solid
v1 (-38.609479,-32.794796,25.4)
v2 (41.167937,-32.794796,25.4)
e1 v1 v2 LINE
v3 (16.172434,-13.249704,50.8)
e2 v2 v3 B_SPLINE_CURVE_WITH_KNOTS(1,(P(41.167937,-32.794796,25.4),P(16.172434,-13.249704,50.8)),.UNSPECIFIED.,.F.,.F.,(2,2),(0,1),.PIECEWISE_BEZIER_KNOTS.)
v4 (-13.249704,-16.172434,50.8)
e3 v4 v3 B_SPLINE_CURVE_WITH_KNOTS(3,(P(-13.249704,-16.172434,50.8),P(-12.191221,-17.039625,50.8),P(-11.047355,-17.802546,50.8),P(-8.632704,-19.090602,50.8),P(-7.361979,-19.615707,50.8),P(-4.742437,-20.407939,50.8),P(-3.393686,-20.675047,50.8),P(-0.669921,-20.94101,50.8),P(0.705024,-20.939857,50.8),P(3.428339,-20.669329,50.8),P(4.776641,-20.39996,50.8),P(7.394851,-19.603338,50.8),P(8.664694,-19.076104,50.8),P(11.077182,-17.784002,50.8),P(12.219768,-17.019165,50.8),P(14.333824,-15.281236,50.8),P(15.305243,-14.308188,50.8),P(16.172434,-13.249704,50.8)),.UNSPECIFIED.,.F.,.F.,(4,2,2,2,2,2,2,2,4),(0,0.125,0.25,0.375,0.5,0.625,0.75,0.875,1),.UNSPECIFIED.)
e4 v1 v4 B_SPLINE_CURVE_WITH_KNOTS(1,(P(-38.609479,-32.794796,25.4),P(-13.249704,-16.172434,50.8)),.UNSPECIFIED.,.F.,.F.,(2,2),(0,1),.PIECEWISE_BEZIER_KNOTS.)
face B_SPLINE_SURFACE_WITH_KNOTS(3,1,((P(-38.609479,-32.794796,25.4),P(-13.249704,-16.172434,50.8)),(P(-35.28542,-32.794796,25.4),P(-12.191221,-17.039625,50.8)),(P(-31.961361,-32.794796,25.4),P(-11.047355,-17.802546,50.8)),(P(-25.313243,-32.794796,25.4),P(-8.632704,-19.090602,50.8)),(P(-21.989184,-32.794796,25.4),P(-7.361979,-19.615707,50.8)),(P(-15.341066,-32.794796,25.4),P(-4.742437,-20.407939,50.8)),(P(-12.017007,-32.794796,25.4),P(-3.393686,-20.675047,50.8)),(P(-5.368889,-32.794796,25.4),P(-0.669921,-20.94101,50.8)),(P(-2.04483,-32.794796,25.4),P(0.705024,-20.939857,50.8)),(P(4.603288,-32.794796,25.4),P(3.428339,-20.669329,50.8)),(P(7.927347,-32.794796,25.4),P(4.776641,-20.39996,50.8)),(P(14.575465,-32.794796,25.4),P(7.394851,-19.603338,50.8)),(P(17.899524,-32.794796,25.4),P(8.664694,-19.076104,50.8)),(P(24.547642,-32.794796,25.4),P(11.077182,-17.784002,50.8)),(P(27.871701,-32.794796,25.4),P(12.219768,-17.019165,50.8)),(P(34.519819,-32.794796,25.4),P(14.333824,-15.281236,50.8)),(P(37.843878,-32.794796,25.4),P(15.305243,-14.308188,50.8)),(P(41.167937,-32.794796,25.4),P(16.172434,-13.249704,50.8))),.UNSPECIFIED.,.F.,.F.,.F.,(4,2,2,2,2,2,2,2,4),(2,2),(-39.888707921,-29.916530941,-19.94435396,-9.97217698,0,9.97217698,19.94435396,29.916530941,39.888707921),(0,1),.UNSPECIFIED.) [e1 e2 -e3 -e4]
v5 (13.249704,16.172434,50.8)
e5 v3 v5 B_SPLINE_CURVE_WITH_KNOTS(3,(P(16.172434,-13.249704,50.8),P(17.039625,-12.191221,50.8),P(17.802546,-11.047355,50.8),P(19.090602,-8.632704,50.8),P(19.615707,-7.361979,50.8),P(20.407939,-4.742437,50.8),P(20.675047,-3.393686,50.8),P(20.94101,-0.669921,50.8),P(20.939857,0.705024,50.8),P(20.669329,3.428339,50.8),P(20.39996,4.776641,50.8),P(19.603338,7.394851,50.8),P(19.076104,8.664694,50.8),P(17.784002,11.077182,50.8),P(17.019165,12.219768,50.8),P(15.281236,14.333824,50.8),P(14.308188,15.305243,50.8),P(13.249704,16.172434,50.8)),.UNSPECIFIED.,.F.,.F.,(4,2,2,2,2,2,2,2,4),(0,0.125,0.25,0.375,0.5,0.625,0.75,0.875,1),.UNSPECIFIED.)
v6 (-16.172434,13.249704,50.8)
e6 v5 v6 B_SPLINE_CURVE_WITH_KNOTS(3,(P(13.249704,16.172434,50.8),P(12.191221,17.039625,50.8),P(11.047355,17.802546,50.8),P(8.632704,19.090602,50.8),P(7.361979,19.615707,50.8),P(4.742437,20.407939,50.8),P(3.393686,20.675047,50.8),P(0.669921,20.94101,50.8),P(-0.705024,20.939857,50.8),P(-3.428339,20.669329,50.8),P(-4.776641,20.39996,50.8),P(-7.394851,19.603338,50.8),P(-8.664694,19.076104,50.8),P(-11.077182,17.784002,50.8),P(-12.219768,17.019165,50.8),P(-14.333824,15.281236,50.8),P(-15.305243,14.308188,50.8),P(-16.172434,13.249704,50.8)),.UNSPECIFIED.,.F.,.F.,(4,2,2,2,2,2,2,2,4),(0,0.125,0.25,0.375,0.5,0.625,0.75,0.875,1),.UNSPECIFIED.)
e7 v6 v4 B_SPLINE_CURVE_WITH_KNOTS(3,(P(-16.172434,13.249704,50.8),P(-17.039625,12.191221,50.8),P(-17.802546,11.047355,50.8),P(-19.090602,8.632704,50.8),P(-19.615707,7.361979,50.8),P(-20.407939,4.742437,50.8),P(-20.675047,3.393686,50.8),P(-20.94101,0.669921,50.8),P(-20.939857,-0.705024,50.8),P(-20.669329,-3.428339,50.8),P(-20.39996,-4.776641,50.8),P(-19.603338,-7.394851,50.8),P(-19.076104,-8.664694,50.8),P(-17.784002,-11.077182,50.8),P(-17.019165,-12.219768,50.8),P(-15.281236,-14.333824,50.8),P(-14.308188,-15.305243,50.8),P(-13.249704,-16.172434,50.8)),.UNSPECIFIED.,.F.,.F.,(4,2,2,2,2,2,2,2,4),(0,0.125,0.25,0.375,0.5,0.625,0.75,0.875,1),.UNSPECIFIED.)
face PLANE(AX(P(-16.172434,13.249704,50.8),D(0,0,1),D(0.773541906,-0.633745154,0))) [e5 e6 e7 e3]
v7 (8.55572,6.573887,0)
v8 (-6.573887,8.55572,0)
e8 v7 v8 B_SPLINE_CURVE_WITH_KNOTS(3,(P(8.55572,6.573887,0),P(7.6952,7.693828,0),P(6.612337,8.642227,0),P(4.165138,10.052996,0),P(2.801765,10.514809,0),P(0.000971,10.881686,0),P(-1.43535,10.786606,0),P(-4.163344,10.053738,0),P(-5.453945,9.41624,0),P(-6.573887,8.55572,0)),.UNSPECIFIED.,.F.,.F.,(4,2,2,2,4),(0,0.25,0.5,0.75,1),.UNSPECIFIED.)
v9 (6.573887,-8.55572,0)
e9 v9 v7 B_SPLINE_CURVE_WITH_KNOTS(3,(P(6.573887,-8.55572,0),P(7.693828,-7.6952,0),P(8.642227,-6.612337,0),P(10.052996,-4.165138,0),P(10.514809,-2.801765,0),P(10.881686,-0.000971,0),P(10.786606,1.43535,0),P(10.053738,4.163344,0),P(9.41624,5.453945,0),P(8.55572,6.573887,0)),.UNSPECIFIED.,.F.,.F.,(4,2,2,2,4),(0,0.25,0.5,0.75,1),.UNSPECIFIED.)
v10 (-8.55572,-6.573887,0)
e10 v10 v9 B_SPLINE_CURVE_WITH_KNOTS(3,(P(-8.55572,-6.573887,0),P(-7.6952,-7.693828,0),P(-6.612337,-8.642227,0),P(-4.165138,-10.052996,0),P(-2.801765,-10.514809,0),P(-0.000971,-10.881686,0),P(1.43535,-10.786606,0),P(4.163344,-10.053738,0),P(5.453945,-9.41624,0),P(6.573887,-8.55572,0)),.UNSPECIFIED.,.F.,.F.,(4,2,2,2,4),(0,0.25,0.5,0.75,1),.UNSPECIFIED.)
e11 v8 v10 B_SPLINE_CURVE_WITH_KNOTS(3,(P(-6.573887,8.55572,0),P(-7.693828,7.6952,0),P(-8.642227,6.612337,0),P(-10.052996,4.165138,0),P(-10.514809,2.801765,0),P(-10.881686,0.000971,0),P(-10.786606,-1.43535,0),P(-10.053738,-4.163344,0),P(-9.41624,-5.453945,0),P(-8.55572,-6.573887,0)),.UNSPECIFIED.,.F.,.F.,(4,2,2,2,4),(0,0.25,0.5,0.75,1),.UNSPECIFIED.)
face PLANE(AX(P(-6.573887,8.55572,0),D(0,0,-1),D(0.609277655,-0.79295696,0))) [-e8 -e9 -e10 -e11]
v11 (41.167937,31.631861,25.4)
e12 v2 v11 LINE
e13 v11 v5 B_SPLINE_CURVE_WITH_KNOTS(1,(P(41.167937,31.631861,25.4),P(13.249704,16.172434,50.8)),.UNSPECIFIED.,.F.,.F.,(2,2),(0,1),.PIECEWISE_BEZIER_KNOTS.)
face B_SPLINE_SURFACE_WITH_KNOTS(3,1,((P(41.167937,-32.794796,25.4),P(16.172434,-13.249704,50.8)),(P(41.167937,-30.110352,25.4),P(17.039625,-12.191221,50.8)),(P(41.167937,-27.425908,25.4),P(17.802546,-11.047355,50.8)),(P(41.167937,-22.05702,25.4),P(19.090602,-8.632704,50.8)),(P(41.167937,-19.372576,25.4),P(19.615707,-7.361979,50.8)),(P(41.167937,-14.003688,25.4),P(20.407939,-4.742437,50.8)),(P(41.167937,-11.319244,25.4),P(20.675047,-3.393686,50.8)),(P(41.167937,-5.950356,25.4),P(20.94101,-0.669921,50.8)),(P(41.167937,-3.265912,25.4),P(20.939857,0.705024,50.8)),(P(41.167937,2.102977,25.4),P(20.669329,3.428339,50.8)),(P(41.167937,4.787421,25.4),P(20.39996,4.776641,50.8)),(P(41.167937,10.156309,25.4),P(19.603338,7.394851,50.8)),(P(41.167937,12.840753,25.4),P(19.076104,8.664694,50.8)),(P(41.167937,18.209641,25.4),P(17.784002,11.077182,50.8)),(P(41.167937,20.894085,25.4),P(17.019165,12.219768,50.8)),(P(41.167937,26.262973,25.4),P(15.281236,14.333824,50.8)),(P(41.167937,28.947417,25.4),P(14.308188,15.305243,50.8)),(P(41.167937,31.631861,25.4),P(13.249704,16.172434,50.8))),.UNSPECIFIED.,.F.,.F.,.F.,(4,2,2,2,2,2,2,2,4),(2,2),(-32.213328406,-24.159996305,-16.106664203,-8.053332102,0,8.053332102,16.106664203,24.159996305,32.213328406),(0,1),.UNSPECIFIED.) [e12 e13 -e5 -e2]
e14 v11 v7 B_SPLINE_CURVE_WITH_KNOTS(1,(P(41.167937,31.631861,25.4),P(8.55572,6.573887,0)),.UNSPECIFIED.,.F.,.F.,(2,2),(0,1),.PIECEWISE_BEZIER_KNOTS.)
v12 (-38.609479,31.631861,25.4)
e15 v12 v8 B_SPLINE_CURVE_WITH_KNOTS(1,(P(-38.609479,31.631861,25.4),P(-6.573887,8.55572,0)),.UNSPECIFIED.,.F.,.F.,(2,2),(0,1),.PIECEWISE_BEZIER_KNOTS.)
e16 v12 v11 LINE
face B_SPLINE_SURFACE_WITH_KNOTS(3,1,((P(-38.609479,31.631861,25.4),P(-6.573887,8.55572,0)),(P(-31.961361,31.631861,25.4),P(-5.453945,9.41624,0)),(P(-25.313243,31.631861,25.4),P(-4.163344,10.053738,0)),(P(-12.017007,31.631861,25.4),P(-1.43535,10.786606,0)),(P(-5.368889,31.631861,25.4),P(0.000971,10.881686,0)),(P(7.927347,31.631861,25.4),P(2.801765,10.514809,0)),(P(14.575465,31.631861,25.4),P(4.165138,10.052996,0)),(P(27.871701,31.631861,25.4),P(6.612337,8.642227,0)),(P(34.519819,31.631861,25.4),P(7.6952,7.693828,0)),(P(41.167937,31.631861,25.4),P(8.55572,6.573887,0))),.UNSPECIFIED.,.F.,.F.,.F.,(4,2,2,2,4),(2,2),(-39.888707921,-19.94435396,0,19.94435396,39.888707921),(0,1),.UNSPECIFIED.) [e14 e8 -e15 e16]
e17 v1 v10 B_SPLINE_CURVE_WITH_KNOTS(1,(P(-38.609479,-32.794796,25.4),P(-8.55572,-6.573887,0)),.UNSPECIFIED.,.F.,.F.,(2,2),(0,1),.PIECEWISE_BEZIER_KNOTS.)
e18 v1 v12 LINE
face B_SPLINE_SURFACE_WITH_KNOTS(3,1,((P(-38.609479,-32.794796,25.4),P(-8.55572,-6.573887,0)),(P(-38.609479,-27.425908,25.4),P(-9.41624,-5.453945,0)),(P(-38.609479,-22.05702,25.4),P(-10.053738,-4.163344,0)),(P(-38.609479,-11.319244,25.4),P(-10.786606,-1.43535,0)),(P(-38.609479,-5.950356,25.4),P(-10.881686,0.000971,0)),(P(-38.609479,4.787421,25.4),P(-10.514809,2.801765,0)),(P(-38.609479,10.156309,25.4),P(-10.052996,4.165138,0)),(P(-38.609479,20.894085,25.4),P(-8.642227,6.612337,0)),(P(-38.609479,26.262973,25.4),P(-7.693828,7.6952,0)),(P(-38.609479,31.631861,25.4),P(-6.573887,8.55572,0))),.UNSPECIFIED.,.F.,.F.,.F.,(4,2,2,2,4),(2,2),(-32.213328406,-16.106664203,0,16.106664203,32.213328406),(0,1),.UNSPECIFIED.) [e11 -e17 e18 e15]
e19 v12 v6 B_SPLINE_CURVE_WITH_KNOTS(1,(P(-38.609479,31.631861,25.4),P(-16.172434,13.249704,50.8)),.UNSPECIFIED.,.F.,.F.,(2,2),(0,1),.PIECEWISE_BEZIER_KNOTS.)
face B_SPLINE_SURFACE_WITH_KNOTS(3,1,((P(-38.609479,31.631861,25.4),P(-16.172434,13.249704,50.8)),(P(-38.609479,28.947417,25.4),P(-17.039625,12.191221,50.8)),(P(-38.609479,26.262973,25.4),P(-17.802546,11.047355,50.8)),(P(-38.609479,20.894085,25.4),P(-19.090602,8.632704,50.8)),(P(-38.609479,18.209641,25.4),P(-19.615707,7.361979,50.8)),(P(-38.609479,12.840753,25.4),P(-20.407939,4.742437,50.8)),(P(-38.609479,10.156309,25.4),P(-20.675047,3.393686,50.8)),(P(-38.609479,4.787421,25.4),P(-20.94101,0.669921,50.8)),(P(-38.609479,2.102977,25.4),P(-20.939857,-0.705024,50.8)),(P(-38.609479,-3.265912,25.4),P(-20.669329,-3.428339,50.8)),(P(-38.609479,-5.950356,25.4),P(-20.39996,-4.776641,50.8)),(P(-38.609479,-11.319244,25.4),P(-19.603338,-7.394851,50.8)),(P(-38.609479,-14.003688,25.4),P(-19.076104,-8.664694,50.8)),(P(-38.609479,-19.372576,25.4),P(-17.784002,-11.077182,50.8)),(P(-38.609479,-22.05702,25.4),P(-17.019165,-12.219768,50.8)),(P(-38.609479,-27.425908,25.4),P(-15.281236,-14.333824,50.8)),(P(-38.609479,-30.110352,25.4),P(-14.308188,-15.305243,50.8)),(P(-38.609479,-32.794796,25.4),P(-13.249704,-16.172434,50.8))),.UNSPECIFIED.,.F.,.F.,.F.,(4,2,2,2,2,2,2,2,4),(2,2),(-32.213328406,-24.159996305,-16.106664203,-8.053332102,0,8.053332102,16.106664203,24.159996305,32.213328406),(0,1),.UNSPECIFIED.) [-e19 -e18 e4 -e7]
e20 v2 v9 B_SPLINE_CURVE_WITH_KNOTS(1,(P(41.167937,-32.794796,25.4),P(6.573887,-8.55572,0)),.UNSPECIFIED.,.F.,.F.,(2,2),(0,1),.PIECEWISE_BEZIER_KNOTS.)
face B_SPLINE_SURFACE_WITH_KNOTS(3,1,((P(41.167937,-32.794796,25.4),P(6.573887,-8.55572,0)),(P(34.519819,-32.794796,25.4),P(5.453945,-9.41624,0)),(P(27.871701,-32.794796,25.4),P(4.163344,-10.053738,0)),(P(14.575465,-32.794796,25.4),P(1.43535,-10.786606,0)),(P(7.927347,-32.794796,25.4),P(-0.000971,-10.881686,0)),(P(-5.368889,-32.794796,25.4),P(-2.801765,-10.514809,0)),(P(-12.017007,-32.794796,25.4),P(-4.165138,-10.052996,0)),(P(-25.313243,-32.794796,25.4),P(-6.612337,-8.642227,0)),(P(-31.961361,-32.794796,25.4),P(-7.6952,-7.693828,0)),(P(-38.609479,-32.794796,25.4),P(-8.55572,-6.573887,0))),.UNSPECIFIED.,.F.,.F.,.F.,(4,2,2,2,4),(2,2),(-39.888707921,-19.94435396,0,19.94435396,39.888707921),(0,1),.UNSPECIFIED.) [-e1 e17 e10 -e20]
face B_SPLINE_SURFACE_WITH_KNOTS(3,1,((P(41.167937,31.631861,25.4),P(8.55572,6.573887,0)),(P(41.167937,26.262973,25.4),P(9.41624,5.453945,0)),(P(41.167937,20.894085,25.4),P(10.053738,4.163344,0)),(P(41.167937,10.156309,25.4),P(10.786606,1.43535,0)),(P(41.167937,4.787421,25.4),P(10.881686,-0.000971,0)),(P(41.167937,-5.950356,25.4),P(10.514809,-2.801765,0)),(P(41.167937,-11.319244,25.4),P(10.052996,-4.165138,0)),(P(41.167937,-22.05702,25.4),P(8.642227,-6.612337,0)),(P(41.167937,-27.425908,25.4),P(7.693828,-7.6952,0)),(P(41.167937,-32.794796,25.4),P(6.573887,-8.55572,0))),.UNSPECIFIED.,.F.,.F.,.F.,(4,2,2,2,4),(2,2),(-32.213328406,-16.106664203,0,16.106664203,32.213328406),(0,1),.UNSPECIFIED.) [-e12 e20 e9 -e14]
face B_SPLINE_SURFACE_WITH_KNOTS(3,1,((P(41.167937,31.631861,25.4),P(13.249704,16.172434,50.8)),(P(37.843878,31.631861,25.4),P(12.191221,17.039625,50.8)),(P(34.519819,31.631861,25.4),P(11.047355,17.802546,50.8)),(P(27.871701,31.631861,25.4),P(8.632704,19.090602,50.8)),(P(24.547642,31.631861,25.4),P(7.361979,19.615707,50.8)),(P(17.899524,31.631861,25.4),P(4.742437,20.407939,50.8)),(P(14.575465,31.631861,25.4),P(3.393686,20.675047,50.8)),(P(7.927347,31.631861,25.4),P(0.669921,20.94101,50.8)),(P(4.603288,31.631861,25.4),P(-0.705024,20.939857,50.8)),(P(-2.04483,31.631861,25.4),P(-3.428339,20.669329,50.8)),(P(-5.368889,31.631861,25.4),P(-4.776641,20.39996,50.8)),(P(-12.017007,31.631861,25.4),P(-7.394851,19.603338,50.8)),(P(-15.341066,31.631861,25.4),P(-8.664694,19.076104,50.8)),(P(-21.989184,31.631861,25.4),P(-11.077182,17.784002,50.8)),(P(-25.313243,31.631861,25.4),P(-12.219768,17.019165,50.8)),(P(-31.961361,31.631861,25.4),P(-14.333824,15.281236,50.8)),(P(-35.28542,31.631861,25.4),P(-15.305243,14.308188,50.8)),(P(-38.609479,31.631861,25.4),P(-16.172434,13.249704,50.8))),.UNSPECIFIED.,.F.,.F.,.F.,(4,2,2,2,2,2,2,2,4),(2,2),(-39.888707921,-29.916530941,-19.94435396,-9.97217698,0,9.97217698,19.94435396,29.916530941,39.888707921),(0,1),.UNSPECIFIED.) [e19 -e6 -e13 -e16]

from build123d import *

# Parameters (mm, degrees)
F3_W      = 79.7774158418
F3_H      = 64.4266568124
F5_FACE_W = 79.7774158418
F5_FACE_H = 64.4266568124


# Not quite as in the source:
# - the arcs of a loft's sections are written as splines that run evenly, so that the points pair up as in the source's solid


with BuildPart() as f5:
    # F3 (on offset) → F5 section 0
    with BuildSketch(Plane.XY.offset(25.4)):
        with Locations((1.2792292982, -0.5814675242)):
            Rectangle(F3_W, F3_H)
    # F2 (on offset) → F5 section 1
    with BuildSketch(Plane.XY.offset(50.8)):
        with BuildLine():
            add(Edge.make_bspline(
                [(-16.1724337652, 13.2497043015), (-17.0396248839, 12.1912209867), (-17.8025456302, 11.0473550868), (-19.0906024978, 8.6327041883), (-19.6157067692, 7.3619788968), (-20.4079389638, 4.7424374092), (-20.6750472976, 3.3936859865), (-20.9410097804, 0.6699214201), (-20.939857353, -0.7050243732), (-20.6693293349, -3.4283392736), (-20.3999604336, -4.7766410415), (-19.6033381546, -7.3948508116), (-19.0761044751, -8.6646940734), (-17.7840016828, -11.0771823799), (-17.0191645197, -12.2197677712), (-15.2812359996, -14.3338240416), (-14.3081876162, -15.3052426465), (-13.2497043015, -16.1724337652)],
                knots=[0, 0, 0, 0, 0.125, 0.125, 0.25, 0.25, 0.375, 0.375, 0.5, 0.5, 0.625, 0.625, 0.75, 0.75, 0.875, 0.875, 1, 1, 1, 1], degree=3))
            add(Edge.make_bspline(
                [(-13.2497043015, -16.1724337652), (-12.1912209867, -17.0396248839), (-11.0473550868, -17.8025456302), (-8.6327041883, -19.0906024978), (-7.3619788968, -19.6157067692), (-4.7424374092, -20.4079389638), (-3.3936859865, -20.6750472976), (-0.6699214201, -20.9410097804), (0.7050243732, -20.939857353), (3.4283392736, -20.6693293349), (4.7766410415, -20.3999604336), (7.3948508116, -19.6033381546), (8.6646940734, -19.0761044751), (11.0771823799, -17.7840016828), (12.2197677712, -17.0191645197), (14.3338240416, -15.2812359996), (15.3052426465, -14.3081876162), (16.1724337652, -13.2497043015)],
                knots=[0, 0, 0, 0, 0.125, 0.125, 0.25, 0.25, 0.375, 0.375, 0.5, 0.5, 0.625, 0.625, 0.75, 0.75, 0.875, 0.875, 1, 1, 1, 1], degree=3))
            add(Edge.make_bspline(
                [(16.1724337652, -13.2497043015), (17.0396248839, -12.1912209867), (17.8025456302, -11.0473550868), (19.0906024978, -8.6327041883), (19.6157067692, -7.3619788968), (20.4079389638, -4.7424374092), (20.6750472976, -3.3936859865), (20.9410097804, -0.6699214201), (20.939857353, 0.7050243732), (20.6693293349, 3.4283392736), (20.3999604336, 4.7766410415), (19.6033381546, 7.3948508116), (19.0761044751, 8.6646940734), (17.7840016828, 11.0771823799), (17.0191645197, 12.2197677712), (15.2812359996, 14.3338240416), (14.3081876162, 15.3052426465), (13.2497043015, 16.1724337652)],
                knots=[0, 0, 0, 0, 0.125, 0.125, 0.25, 0.25, 0.375, 0.375, 0.5, 0.5, 0.625, 0.625, 0.75, 0.75, 0.875, 0.875, 1, 1, 1, 1], degree=3))
            add(Edge.make_bspline(
                [(13.2497043015, 16.1724337652), (12.1912209867, 17.0396248839), (11.0473550868, 17.8025456302), (8.6327041883, 19.0906024978), (7.3619788968, 19.6157067692), (4.7424374092, 20.4079389638), (3.3936859865, 20.6750472976), (0.6699214201, 20.9410097804), (-0.7050243732, 20.939857353), (-3.4283392736, 20.6693293349), (-4.7766410415, 20.3999604336), (-7.3948508116, 19.6033381546), (-8.6646940734, 19.0761044751), (-11.0771823799, 17.7840016828), (-12.2197677712, 17.0191645197), (-14.3338240416, 15.2812359996), (-15.3052426465, 14.3081876162), (-16.1724337652, 13.2497043015)],
                knots=[0, 0, 0, 0, 0.125, 0.125, 0.25, 0.25, 0.375, 0.375, 0.5, 0.5, 0.625, 0.625, 0.75, 0.75, 0.875, 0.875, 1, 1, 1, 1], degree=3))
        make_face()
    loft(ruled=True)

    # F5_face (on face) → F6 section 0
    with BuildSketch(Plane(origin=(1.2792292982, -0.5814675242, 25.4), x_dir=(1, 0, 0), z_dir=(0, 0, -1))):
        Rectangle(F5_FACE_W, F5_FACE_H)
    # F4 (on Top) → F6 section 1
    with BuildSketch(Plane.XY):
        with BuildLine():
            add(Edge.make_bspline(
                [(8.5557200784, 6.5738865133), (7.6952003461, 7.6938276526), (6.6123366987, 8.6422274732), (4.1651377242, 10.0529955761), (2.8017652653, 10.5148087816), (0.0009706408, 10.8816860538), (-1.4353495317, 10.78660577), (-4.1633442138, 10.0537384724), (-5.4539453739, 9.4162398107), (-6.5738865133, 8.5557200784)],
                knots=[0, 0, 0, 0, 0.25, 0.25, 0.5, 0.5, 0.75, 0.75, 1, 1, 1, 1], degree=3))
            add(Edge.make_bspline(
                [(-6.5738865133, 8.5557200784), (-7.6938276526, 7.6952003461), (-8.6422274732, 6.6123366987), (-10.0529955761, 4.1651377242), (-10.5148087816, 2.8017652653), (-10.8816860538, 0.0009706408), (-10.78660577, -1.4353495317), (-10.0537384724, -4.1633442138), (-9.4162398107, -5.4539453739), (-8.5557200784, -6.5738865133)],
                knots=[0, 0, 0, 0, 0.25, 0.25, 0.5, 0.5, 0.75, 0.75, 1, 1, 1, 1], degree=3))
            add(Edge.make_bspline(
                [(-8.5557200784, -6.5738865133), (-7.6952003461, -7.6938276526), (-6.6123366987, -8.6422274732), (-4.1651377242, -10.0529955761), (-2.8017652653, -10.5148087816), (-0.0009706408, -10.8816860538), (1.4353495317, -10.78660577), (4.1633442138, -10.0537384724), (5.4539453739, -9.4162398107), (6.5738865133, -8.5557200784)],
                knots=[0, 0, 0, 0, 0.25, 0.25, 0.5, 0.5, 0.75, 0.75, 1, 1, 1, 1], degree=3))
            add(Edge.make_bspline(
                [(6.5738865133, -8.5557200784), (7.6938276526, -7.6952003461), (8.6422274732, -6.6123366987), (10.0529955761, -4.1651377242), (10.5148087816, -2.8017652653), (10.8816860538, -0.0009706408), (10.78660577, 1.4353495317), (10.0537384724, 4.1633442138), (9.4162398107, 5.4539453739), (8.5557200784, 6.5738865133)],
                knots=[0, 0, 0, 0, 0.25, 0.25, 0.5, 0.5, 0.75, 0.75, 1, 1, 1, 1], degree=3))
        make_face()
    loft(ruled=True)


solid = f5.part
